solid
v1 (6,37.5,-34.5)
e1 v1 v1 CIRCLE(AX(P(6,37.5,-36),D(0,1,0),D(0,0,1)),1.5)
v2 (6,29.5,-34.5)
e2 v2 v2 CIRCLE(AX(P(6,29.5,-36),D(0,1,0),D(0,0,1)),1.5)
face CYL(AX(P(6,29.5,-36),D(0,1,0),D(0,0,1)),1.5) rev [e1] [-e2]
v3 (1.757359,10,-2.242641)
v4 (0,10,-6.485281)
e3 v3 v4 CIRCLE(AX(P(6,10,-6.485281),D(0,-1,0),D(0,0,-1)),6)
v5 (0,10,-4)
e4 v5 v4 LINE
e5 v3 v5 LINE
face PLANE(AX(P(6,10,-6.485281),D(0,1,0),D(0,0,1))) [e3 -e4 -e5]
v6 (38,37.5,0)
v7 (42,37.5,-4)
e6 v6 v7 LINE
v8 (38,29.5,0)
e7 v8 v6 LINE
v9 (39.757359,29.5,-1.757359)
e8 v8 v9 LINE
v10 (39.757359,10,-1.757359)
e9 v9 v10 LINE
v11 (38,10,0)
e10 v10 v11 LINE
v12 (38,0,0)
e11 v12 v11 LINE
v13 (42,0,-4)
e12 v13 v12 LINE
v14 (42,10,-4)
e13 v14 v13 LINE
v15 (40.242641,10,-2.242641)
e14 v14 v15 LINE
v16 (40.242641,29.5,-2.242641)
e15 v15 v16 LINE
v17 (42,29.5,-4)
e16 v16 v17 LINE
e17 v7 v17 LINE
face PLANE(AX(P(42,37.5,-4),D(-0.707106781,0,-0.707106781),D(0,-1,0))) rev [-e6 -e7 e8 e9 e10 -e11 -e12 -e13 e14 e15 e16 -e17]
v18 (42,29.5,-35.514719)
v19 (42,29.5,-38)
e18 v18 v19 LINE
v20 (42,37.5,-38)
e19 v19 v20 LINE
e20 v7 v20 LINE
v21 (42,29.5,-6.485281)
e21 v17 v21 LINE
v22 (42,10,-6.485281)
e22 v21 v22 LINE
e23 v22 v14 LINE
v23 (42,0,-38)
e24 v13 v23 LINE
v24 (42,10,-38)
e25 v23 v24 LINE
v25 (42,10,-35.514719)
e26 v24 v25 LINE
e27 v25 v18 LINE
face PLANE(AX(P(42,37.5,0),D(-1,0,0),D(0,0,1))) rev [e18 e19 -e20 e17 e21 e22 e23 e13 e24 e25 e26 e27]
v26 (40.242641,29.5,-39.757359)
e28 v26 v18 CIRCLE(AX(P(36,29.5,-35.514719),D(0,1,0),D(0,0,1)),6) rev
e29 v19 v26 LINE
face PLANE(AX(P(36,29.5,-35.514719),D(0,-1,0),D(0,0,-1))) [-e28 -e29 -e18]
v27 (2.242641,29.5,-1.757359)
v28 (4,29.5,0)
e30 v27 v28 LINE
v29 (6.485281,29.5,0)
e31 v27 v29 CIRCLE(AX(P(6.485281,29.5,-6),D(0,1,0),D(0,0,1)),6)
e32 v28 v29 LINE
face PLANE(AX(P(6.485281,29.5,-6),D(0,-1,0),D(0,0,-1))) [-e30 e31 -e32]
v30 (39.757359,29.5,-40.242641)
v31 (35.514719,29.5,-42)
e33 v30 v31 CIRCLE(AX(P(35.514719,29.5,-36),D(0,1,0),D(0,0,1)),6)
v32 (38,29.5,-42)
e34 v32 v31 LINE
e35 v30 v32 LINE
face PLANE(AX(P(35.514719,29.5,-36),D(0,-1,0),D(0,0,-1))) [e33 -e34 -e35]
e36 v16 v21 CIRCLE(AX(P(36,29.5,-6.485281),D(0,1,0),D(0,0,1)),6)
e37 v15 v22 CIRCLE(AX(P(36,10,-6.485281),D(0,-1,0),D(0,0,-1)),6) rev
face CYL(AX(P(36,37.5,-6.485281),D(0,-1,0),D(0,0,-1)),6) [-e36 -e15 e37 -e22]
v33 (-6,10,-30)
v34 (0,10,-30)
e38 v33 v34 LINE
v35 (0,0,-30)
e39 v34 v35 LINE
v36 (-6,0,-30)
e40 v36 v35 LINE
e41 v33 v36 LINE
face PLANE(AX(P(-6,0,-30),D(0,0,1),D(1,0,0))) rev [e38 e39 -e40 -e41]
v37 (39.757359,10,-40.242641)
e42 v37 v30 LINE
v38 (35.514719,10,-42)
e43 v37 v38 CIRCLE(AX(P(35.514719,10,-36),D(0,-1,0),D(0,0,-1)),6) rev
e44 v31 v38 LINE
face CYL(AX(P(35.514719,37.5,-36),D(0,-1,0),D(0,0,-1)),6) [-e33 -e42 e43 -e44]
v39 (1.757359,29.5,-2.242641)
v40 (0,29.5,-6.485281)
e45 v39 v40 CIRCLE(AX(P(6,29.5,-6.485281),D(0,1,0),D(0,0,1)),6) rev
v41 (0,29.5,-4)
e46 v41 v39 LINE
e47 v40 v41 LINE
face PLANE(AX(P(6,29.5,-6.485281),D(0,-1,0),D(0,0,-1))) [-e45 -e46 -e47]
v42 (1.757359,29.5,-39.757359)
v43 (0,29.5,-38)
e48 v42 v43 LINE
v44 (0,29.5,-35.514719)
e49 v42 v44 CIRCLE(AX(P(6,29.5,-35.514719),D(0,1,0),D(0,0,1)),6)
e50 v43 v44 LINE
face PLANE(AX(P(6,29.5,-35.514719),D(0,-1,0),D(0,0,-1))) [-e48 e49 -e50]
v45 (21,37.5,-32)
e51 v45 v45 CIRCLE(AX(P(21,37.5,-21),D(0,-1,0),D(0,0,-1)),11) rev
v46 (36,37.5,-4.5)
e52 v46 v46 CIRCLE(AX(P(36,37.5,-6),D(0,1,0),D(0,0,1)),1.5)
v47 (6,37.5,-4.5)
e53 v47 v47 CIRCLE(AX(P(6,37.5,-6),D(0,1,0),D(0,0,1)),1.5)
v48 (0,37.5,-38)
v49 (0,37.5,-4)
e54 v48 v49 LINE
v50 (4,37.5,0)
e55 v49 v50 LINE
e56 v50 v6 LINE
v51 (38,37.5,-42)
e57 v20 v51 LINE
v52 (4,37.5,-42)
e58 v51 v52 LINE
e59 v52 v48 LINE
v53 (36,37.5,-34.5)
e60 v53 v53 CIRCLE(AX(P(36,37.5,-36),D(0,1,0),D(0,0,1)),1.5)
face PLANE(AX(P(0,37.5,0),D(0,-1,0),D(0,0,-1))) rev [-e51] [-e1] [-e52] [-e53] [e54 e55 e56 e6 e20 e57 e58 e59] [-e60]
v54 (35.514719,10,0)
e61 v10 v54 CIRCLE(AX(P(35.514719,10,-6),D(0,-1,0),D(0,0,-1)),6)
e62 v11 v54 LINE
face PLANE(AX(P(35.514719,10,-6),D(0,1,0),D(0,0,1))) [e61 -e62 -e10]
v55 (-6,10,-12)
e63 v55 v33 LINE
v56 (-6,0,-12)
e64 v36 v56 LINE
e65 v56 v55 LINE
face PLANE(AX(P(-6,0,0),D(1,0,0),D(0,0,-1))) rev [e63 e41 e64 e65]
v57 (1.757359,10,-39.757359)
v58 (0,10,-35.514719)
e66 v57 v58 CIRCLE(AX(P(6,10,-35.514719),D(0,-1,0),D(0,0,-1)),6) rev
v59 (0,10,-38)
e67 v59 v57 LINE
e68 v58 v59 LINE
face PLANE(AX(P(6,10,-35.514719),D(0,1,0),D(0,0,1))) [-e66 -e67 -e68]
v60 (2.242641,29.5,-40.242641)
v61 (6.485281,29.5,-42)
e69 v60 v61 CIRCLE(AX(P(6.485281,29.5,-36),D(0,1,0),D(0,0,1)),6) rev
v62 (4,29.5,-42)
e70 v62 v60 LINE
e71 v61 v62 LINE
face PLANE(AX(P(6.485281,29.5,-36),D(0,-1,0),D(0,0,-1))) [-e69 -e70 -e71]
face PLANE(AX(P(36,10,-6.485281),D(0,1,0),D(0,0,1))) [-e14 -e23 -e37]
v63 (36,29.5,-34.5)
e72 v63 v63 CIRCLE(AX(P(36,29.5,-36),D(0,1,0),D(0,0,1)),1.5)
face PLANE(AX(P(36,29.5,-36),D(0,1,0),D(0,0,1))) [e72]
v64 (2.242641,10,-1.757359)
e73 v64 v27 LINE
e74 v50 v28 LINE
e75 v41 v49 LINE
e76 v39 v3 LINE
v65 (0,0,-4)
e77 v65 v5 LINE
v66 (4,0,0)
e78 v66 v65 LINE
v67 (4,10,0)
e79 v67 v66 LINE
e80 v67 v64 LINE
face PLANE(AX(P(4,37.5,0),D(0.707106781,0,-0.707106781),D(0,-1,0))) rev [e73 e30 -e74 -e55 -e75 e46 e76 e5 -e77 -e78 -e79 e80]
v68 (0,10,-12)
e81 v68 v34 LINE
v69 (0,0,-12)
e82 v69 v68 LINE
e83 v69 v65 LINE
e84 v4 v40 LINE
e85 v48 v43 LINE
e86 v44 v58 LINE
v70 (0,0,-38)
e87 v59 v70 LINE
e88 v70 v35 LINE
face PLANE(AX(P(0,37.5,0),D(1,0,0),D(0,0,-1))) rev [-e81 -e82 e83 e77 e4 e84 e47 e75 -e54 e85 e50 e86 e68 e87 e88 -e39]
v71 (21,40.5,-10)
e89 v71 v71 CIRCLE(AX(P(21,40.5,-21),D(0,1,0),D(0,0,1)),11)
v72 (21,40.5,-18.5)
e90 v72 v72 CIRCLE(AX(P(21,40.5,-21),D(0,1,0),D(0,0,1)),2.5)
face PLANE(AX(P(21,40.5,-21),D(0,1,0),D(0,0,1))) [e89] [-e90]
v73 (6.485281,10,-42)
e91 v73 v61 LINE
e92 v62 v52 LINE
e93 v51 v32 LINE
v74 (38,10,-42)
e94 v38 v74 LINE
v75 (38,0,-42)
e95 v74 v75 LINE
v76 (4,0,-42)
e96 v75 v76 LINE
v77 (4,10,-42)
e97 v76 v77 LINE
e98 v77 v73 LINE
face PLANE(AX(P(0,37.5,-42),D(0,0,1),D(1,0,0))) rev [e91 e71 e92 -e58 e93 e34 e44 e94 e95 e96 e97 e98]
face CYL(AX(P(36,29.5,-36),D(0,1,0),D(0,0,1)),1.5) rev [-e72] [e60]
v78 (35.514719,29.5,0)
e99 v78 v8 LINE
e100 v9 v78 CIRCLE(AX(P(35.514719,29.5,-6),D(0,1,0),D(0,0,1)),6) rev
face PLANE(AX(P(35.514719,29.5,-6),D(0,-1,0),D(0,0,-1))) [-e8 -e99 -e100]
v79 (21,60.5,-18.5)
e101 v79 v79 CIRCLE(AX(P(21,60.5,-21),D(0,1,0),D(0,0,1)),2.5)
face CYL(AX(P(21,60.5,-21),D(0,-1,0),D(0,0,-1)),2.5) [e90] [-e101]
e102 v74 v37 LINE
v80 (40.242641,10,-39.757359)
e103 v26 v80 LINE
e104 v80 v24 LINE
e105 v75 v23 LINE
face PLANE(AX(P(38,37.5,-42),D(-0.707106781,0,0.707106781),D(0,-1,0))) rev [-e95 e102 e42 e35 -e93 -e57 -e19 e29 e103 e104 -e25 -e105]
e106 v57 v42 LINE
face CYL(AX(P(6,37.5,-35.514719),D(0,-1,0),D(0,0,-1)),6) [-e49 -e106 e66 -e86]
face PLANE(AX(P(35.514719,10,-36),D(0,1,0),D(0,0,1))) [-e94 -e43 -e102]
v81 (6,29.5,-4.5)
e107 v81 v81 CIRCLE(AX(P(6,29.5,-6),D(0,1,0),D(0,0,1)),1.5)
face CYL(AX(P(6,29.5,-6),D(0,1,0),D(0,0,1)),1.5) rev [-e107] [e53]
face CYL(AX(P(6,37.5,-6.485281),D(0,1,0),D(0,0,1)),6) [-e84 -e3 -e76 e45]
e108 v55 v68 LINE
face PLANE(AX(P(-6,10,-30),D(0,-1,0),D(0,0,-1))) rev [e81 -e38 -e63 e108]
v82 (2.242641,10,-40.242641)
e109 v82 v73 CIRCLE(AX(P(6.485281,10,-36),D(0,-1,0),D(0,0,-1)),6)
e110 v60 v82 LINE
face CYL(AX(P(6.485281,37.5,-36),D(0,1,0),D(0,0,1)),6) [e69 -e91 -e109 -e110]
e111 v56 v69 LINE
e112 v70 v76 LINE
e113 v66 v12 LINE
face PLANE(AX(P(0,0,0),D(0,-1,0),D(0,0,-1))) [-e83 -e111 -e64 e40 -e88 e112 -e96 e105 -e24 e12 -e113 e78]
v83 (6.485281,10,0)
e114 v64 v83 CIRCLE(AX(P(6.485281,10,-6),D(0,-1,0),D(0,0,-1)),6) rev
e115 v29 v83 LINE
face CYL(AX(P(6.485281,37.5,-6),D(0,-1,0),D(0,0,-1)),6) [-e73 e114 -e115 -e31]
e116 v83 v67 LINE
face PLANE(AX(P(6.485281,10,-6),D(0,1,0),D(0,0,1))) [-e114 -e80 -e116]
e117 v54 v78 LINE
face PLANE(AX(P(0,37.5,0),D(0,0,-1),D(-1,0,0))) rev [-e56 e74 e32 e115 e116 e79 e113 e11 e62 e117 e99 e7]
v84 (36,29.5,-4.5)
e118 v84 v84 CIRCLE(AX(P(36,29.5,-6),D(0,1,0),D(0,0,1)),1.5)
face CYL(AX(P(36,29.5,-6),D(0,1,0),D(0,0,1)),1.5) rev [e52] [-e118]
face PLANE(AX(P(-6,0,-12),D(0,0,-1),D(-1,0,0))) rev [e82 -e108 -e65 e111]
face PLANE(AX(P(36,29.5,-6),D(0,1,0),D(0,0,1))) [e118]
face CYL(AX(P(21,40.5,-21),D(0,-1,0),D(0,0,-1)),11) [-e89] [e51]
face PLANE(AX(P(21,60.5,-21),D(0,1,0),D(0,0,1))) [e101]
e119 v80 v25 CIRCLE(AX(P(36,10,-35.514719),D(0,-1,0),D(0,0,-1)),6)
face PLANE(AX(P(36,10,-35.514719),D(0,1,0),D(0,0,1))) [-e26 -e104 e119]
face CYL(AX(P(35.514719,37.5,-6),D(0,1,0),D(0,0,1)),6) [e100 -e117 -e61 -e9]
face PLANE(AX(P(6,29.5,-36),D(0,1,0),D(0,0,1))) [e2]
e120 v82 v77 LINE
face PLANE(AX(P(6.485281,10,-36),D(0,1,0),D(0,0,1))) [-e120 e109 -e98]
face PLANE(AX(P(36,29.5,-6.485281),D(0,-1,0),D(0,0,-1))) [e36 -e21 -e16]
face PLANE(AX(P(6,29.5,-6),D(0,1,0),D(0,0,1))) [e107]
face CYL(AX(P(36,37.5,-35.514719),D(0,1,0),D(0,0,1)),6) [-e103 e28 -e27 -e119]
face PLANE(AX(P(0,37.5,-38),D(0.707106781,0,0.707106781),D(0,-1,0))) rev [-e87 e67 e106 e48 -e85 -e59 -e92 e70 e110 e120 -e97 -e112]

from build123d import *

# Parameters (mm, degrees)
SKETCH1_W           = 42
SKETCH1_H           = 42
BOSS_EXTRUDE1_DEPTH = 37.5
SKETCH2_R           = 2.5
BOSS_EXTRUDE2_DEPTH = 23
SKETCH3_R           = 1.5
CUT_EXTRUDE1_DEPTH  = 8
SKETCH4_R           = 11
BOSS_EXTRUDE3_DEPTH = 3
CHAMFER1_SIZE       = 4
SKETCH5_W           = 18
SKETCH5_H           = 10
BOSS_EXTRUDE4_DEPTH = 6
FILLET1_START       = 10
FILLET1_DEPTH       = 19.5
FILLET2_START       = 10
FILLET2_DEPTH       = 19.5
FILLET3_START       = 10
FILLET3_DEPTH       = 19.5


with BuildPart() as part:
    # Sketch1 → Boss-Extrude1 (new body)
    with BuildSketch(Plane(origin=(0, 0, 0), x_dir=(1, 0, 0), z_dir=(0, 1, 0))):
        with Locations((21, 21)):
            Rectangle(SKETCH1_W, SKETCH1_H)
    extrude(amount=BOSS_EXTRUDE1_DEPTH)

    # Sketch2 → Boss-Extrude2 (add)
    with BuildSketch(Plane(origin=(0, 37.5, 0), x_dir=(1, 0, 0), z_dir=(0, 1, 0))):
        with Locations(Location((21, 21, 0), (0, 0, 90))):
            Circle(SKETCH2_R)
    extrude(amount=BOSS_EXTRUDE2_DEPTH)

    # Sketch3 → Cut-Extrude1 (cut)
    with BuildSketch(Plane(origin=(0, 37.5, 0), x_dir=(1, 0, 0), z_dir=(0, 1, 0))):
        with Locations(Location((6, 36, 0), (0, 0, 270))):
            Circle(SKETCH3_R)
        with Locations(Location((36, 36, 0), (0, 0, 270))):
            Circle(SKETCH3_R)
        with Locations(Location((36, 6, 0), (0, 0, 270))):
            Circle(SKETCH3_R)
        with Locations(Location((6, 6, 0), (0, 0, 270))):
            Circle(SKETCH3_R)
    extrude(amount=-CUT_EXTRUDE1_DEPTH, mode=Mode.SUBTRACT)

    # Sketch4 → Boss-Extrude3 (add)
    with BuildSketch(Plane(origin=(0, 37.5, 0), x_dir=(1, 0, 0), z_dir=(0, 1, 0))):
        with Locations(Location((21, 21, 0), (0, 0, 90))):
            Circle(SKETCH4_R)
    extrude(amount=BOSS_EXTRUDE3_DEPTH)

    # Chamfer1
    chamfer1_edges = [part.edges().sort_by_distance(p)[0] for p in [
        (0, 18.75, -42),
        (42, 18.75, -42),
        (42, 18.75, 0),
        (0, 18.75, 0),
    ]]
    chamfer(chamfer1_edges, length=CHAMFER1_SIZE)

    # Sketch5 → Boss-Extrude4 (add)
    with BuildSketch(Plane.ZY):
        with Locations((-21, 5)):
            Rectangle(SKETCH5_W, SKETCH5_H)
    extrude(amount=BOSS_EXTRUDE4_DEPTH)

    # Fillet1: read off the stored shape, not the designer's step
    # Fillet1 outline → Fillet1 (cut)
    with BuildSketch(Plane(origin=(0, 0, 0), x_dir=(1, 0, 0), z_dir=(0, 1, 0)).offset(FILLET1_START)):
        with BuildLine():
            ThreePointArc((42, 6.485281374), (41.543277195, 4.18918078), (40.242640687, 2.242640687))
            Line((40.242640687, 2.242640687), (42, 4))
            Line((42, 4), (42, 6.485281374))
        make_face()
        with BuildLine():
            ThreePointArc((39.757359313, 1.757359313), (37.81081922, 0.456722805), (35.514718626, 0))
            Line((35.514718626, 0), (38, 0))
            Line((38, 0), (39.757359313, 1.757359313))
        make_face()
    extrude(amount=FILLET1_DEPTH, mode=Mode.SUBTRACT)

    # Fillet2: read off the stored shape, not the designer's step
    # Fillet2 outline → Fillet2 (cut)
    with BuildSketch(Plane(origin=(0, 0, 0), x_dir=(1, 0, 0), z_dir=(0, 1, 0)).offset(FILLET2_START)):
        with BuildLine():
            ThreePointArc((35.514718626, 42), (37.81081922, 41.543277195), (39.757359313, 40.242640687))
            Line((39.757359313, 40.242640687), (38, 42))
            Line((38, 42), (35.514718626, 42))
        make_face()
        with BuildLine():
            ThreePointArc((40.242640687, 39.757359313), (41.543277195, 37.81081922), (42, 35.514718626))
            Line((42, 35.514718626), (42, 38))
            Line((42, 38), (40.242640687, 39.757359313))
        make_face()
    extrude(amount=FILLET2_DEPTH, mode=Mode.SUBTRACT)

    # Fillet3: read off the stored shape, not the designer's step
    # Fillet3 outline → Fillet3 (cut)
    with BuildSketch(Plane(origin=(0, 0, 0), x_dir=(1, 0, 0), z_dir=(0, 1, 0)).offset(FILLET3_START)):
        with BuildLine():
            ThreePointArc((6.485281374, 0), (4.18918078, 0.456722805), (2.242640687, 1.757359313))
            Line((2.242640687, 1.757359313), (4, 0))
            Line((4, 0), (6.485281374, 0))
        make_face()
        with BuildLine():
            ThreePointArc((1.757359313, 2.242640687), (0.456722805, 4.18918078), (0, 6.485281374))
            Line((0, 6.485281374), (0, 4))
            Line((0, 4), (1.757359313, 2.242640687))
        make_face()
        with BuildLine():
            ThreePointArc((0, 35.514718626), (0.456722805, 37.81081922), (1.757359313, 39.757359313))
            Line((1.757359313, 39.757359313), (0, 38))
            Line((0, 38), (0, 35.514718626))
        make_face()
        with BuildLine():
            ThreePointArc((2.242640687, 40.242640687), (4.18918078, 41.543277195), (6.485281374, 42))
            Line((6.485281374, 42), (4, 42))
            Line((4, 42), (2.242640687, 40.242640687))
        make_face()
    extrude(amount=FILLET3_DEPTH, mode=Mode.SUBTRACT)


solid = part.part
